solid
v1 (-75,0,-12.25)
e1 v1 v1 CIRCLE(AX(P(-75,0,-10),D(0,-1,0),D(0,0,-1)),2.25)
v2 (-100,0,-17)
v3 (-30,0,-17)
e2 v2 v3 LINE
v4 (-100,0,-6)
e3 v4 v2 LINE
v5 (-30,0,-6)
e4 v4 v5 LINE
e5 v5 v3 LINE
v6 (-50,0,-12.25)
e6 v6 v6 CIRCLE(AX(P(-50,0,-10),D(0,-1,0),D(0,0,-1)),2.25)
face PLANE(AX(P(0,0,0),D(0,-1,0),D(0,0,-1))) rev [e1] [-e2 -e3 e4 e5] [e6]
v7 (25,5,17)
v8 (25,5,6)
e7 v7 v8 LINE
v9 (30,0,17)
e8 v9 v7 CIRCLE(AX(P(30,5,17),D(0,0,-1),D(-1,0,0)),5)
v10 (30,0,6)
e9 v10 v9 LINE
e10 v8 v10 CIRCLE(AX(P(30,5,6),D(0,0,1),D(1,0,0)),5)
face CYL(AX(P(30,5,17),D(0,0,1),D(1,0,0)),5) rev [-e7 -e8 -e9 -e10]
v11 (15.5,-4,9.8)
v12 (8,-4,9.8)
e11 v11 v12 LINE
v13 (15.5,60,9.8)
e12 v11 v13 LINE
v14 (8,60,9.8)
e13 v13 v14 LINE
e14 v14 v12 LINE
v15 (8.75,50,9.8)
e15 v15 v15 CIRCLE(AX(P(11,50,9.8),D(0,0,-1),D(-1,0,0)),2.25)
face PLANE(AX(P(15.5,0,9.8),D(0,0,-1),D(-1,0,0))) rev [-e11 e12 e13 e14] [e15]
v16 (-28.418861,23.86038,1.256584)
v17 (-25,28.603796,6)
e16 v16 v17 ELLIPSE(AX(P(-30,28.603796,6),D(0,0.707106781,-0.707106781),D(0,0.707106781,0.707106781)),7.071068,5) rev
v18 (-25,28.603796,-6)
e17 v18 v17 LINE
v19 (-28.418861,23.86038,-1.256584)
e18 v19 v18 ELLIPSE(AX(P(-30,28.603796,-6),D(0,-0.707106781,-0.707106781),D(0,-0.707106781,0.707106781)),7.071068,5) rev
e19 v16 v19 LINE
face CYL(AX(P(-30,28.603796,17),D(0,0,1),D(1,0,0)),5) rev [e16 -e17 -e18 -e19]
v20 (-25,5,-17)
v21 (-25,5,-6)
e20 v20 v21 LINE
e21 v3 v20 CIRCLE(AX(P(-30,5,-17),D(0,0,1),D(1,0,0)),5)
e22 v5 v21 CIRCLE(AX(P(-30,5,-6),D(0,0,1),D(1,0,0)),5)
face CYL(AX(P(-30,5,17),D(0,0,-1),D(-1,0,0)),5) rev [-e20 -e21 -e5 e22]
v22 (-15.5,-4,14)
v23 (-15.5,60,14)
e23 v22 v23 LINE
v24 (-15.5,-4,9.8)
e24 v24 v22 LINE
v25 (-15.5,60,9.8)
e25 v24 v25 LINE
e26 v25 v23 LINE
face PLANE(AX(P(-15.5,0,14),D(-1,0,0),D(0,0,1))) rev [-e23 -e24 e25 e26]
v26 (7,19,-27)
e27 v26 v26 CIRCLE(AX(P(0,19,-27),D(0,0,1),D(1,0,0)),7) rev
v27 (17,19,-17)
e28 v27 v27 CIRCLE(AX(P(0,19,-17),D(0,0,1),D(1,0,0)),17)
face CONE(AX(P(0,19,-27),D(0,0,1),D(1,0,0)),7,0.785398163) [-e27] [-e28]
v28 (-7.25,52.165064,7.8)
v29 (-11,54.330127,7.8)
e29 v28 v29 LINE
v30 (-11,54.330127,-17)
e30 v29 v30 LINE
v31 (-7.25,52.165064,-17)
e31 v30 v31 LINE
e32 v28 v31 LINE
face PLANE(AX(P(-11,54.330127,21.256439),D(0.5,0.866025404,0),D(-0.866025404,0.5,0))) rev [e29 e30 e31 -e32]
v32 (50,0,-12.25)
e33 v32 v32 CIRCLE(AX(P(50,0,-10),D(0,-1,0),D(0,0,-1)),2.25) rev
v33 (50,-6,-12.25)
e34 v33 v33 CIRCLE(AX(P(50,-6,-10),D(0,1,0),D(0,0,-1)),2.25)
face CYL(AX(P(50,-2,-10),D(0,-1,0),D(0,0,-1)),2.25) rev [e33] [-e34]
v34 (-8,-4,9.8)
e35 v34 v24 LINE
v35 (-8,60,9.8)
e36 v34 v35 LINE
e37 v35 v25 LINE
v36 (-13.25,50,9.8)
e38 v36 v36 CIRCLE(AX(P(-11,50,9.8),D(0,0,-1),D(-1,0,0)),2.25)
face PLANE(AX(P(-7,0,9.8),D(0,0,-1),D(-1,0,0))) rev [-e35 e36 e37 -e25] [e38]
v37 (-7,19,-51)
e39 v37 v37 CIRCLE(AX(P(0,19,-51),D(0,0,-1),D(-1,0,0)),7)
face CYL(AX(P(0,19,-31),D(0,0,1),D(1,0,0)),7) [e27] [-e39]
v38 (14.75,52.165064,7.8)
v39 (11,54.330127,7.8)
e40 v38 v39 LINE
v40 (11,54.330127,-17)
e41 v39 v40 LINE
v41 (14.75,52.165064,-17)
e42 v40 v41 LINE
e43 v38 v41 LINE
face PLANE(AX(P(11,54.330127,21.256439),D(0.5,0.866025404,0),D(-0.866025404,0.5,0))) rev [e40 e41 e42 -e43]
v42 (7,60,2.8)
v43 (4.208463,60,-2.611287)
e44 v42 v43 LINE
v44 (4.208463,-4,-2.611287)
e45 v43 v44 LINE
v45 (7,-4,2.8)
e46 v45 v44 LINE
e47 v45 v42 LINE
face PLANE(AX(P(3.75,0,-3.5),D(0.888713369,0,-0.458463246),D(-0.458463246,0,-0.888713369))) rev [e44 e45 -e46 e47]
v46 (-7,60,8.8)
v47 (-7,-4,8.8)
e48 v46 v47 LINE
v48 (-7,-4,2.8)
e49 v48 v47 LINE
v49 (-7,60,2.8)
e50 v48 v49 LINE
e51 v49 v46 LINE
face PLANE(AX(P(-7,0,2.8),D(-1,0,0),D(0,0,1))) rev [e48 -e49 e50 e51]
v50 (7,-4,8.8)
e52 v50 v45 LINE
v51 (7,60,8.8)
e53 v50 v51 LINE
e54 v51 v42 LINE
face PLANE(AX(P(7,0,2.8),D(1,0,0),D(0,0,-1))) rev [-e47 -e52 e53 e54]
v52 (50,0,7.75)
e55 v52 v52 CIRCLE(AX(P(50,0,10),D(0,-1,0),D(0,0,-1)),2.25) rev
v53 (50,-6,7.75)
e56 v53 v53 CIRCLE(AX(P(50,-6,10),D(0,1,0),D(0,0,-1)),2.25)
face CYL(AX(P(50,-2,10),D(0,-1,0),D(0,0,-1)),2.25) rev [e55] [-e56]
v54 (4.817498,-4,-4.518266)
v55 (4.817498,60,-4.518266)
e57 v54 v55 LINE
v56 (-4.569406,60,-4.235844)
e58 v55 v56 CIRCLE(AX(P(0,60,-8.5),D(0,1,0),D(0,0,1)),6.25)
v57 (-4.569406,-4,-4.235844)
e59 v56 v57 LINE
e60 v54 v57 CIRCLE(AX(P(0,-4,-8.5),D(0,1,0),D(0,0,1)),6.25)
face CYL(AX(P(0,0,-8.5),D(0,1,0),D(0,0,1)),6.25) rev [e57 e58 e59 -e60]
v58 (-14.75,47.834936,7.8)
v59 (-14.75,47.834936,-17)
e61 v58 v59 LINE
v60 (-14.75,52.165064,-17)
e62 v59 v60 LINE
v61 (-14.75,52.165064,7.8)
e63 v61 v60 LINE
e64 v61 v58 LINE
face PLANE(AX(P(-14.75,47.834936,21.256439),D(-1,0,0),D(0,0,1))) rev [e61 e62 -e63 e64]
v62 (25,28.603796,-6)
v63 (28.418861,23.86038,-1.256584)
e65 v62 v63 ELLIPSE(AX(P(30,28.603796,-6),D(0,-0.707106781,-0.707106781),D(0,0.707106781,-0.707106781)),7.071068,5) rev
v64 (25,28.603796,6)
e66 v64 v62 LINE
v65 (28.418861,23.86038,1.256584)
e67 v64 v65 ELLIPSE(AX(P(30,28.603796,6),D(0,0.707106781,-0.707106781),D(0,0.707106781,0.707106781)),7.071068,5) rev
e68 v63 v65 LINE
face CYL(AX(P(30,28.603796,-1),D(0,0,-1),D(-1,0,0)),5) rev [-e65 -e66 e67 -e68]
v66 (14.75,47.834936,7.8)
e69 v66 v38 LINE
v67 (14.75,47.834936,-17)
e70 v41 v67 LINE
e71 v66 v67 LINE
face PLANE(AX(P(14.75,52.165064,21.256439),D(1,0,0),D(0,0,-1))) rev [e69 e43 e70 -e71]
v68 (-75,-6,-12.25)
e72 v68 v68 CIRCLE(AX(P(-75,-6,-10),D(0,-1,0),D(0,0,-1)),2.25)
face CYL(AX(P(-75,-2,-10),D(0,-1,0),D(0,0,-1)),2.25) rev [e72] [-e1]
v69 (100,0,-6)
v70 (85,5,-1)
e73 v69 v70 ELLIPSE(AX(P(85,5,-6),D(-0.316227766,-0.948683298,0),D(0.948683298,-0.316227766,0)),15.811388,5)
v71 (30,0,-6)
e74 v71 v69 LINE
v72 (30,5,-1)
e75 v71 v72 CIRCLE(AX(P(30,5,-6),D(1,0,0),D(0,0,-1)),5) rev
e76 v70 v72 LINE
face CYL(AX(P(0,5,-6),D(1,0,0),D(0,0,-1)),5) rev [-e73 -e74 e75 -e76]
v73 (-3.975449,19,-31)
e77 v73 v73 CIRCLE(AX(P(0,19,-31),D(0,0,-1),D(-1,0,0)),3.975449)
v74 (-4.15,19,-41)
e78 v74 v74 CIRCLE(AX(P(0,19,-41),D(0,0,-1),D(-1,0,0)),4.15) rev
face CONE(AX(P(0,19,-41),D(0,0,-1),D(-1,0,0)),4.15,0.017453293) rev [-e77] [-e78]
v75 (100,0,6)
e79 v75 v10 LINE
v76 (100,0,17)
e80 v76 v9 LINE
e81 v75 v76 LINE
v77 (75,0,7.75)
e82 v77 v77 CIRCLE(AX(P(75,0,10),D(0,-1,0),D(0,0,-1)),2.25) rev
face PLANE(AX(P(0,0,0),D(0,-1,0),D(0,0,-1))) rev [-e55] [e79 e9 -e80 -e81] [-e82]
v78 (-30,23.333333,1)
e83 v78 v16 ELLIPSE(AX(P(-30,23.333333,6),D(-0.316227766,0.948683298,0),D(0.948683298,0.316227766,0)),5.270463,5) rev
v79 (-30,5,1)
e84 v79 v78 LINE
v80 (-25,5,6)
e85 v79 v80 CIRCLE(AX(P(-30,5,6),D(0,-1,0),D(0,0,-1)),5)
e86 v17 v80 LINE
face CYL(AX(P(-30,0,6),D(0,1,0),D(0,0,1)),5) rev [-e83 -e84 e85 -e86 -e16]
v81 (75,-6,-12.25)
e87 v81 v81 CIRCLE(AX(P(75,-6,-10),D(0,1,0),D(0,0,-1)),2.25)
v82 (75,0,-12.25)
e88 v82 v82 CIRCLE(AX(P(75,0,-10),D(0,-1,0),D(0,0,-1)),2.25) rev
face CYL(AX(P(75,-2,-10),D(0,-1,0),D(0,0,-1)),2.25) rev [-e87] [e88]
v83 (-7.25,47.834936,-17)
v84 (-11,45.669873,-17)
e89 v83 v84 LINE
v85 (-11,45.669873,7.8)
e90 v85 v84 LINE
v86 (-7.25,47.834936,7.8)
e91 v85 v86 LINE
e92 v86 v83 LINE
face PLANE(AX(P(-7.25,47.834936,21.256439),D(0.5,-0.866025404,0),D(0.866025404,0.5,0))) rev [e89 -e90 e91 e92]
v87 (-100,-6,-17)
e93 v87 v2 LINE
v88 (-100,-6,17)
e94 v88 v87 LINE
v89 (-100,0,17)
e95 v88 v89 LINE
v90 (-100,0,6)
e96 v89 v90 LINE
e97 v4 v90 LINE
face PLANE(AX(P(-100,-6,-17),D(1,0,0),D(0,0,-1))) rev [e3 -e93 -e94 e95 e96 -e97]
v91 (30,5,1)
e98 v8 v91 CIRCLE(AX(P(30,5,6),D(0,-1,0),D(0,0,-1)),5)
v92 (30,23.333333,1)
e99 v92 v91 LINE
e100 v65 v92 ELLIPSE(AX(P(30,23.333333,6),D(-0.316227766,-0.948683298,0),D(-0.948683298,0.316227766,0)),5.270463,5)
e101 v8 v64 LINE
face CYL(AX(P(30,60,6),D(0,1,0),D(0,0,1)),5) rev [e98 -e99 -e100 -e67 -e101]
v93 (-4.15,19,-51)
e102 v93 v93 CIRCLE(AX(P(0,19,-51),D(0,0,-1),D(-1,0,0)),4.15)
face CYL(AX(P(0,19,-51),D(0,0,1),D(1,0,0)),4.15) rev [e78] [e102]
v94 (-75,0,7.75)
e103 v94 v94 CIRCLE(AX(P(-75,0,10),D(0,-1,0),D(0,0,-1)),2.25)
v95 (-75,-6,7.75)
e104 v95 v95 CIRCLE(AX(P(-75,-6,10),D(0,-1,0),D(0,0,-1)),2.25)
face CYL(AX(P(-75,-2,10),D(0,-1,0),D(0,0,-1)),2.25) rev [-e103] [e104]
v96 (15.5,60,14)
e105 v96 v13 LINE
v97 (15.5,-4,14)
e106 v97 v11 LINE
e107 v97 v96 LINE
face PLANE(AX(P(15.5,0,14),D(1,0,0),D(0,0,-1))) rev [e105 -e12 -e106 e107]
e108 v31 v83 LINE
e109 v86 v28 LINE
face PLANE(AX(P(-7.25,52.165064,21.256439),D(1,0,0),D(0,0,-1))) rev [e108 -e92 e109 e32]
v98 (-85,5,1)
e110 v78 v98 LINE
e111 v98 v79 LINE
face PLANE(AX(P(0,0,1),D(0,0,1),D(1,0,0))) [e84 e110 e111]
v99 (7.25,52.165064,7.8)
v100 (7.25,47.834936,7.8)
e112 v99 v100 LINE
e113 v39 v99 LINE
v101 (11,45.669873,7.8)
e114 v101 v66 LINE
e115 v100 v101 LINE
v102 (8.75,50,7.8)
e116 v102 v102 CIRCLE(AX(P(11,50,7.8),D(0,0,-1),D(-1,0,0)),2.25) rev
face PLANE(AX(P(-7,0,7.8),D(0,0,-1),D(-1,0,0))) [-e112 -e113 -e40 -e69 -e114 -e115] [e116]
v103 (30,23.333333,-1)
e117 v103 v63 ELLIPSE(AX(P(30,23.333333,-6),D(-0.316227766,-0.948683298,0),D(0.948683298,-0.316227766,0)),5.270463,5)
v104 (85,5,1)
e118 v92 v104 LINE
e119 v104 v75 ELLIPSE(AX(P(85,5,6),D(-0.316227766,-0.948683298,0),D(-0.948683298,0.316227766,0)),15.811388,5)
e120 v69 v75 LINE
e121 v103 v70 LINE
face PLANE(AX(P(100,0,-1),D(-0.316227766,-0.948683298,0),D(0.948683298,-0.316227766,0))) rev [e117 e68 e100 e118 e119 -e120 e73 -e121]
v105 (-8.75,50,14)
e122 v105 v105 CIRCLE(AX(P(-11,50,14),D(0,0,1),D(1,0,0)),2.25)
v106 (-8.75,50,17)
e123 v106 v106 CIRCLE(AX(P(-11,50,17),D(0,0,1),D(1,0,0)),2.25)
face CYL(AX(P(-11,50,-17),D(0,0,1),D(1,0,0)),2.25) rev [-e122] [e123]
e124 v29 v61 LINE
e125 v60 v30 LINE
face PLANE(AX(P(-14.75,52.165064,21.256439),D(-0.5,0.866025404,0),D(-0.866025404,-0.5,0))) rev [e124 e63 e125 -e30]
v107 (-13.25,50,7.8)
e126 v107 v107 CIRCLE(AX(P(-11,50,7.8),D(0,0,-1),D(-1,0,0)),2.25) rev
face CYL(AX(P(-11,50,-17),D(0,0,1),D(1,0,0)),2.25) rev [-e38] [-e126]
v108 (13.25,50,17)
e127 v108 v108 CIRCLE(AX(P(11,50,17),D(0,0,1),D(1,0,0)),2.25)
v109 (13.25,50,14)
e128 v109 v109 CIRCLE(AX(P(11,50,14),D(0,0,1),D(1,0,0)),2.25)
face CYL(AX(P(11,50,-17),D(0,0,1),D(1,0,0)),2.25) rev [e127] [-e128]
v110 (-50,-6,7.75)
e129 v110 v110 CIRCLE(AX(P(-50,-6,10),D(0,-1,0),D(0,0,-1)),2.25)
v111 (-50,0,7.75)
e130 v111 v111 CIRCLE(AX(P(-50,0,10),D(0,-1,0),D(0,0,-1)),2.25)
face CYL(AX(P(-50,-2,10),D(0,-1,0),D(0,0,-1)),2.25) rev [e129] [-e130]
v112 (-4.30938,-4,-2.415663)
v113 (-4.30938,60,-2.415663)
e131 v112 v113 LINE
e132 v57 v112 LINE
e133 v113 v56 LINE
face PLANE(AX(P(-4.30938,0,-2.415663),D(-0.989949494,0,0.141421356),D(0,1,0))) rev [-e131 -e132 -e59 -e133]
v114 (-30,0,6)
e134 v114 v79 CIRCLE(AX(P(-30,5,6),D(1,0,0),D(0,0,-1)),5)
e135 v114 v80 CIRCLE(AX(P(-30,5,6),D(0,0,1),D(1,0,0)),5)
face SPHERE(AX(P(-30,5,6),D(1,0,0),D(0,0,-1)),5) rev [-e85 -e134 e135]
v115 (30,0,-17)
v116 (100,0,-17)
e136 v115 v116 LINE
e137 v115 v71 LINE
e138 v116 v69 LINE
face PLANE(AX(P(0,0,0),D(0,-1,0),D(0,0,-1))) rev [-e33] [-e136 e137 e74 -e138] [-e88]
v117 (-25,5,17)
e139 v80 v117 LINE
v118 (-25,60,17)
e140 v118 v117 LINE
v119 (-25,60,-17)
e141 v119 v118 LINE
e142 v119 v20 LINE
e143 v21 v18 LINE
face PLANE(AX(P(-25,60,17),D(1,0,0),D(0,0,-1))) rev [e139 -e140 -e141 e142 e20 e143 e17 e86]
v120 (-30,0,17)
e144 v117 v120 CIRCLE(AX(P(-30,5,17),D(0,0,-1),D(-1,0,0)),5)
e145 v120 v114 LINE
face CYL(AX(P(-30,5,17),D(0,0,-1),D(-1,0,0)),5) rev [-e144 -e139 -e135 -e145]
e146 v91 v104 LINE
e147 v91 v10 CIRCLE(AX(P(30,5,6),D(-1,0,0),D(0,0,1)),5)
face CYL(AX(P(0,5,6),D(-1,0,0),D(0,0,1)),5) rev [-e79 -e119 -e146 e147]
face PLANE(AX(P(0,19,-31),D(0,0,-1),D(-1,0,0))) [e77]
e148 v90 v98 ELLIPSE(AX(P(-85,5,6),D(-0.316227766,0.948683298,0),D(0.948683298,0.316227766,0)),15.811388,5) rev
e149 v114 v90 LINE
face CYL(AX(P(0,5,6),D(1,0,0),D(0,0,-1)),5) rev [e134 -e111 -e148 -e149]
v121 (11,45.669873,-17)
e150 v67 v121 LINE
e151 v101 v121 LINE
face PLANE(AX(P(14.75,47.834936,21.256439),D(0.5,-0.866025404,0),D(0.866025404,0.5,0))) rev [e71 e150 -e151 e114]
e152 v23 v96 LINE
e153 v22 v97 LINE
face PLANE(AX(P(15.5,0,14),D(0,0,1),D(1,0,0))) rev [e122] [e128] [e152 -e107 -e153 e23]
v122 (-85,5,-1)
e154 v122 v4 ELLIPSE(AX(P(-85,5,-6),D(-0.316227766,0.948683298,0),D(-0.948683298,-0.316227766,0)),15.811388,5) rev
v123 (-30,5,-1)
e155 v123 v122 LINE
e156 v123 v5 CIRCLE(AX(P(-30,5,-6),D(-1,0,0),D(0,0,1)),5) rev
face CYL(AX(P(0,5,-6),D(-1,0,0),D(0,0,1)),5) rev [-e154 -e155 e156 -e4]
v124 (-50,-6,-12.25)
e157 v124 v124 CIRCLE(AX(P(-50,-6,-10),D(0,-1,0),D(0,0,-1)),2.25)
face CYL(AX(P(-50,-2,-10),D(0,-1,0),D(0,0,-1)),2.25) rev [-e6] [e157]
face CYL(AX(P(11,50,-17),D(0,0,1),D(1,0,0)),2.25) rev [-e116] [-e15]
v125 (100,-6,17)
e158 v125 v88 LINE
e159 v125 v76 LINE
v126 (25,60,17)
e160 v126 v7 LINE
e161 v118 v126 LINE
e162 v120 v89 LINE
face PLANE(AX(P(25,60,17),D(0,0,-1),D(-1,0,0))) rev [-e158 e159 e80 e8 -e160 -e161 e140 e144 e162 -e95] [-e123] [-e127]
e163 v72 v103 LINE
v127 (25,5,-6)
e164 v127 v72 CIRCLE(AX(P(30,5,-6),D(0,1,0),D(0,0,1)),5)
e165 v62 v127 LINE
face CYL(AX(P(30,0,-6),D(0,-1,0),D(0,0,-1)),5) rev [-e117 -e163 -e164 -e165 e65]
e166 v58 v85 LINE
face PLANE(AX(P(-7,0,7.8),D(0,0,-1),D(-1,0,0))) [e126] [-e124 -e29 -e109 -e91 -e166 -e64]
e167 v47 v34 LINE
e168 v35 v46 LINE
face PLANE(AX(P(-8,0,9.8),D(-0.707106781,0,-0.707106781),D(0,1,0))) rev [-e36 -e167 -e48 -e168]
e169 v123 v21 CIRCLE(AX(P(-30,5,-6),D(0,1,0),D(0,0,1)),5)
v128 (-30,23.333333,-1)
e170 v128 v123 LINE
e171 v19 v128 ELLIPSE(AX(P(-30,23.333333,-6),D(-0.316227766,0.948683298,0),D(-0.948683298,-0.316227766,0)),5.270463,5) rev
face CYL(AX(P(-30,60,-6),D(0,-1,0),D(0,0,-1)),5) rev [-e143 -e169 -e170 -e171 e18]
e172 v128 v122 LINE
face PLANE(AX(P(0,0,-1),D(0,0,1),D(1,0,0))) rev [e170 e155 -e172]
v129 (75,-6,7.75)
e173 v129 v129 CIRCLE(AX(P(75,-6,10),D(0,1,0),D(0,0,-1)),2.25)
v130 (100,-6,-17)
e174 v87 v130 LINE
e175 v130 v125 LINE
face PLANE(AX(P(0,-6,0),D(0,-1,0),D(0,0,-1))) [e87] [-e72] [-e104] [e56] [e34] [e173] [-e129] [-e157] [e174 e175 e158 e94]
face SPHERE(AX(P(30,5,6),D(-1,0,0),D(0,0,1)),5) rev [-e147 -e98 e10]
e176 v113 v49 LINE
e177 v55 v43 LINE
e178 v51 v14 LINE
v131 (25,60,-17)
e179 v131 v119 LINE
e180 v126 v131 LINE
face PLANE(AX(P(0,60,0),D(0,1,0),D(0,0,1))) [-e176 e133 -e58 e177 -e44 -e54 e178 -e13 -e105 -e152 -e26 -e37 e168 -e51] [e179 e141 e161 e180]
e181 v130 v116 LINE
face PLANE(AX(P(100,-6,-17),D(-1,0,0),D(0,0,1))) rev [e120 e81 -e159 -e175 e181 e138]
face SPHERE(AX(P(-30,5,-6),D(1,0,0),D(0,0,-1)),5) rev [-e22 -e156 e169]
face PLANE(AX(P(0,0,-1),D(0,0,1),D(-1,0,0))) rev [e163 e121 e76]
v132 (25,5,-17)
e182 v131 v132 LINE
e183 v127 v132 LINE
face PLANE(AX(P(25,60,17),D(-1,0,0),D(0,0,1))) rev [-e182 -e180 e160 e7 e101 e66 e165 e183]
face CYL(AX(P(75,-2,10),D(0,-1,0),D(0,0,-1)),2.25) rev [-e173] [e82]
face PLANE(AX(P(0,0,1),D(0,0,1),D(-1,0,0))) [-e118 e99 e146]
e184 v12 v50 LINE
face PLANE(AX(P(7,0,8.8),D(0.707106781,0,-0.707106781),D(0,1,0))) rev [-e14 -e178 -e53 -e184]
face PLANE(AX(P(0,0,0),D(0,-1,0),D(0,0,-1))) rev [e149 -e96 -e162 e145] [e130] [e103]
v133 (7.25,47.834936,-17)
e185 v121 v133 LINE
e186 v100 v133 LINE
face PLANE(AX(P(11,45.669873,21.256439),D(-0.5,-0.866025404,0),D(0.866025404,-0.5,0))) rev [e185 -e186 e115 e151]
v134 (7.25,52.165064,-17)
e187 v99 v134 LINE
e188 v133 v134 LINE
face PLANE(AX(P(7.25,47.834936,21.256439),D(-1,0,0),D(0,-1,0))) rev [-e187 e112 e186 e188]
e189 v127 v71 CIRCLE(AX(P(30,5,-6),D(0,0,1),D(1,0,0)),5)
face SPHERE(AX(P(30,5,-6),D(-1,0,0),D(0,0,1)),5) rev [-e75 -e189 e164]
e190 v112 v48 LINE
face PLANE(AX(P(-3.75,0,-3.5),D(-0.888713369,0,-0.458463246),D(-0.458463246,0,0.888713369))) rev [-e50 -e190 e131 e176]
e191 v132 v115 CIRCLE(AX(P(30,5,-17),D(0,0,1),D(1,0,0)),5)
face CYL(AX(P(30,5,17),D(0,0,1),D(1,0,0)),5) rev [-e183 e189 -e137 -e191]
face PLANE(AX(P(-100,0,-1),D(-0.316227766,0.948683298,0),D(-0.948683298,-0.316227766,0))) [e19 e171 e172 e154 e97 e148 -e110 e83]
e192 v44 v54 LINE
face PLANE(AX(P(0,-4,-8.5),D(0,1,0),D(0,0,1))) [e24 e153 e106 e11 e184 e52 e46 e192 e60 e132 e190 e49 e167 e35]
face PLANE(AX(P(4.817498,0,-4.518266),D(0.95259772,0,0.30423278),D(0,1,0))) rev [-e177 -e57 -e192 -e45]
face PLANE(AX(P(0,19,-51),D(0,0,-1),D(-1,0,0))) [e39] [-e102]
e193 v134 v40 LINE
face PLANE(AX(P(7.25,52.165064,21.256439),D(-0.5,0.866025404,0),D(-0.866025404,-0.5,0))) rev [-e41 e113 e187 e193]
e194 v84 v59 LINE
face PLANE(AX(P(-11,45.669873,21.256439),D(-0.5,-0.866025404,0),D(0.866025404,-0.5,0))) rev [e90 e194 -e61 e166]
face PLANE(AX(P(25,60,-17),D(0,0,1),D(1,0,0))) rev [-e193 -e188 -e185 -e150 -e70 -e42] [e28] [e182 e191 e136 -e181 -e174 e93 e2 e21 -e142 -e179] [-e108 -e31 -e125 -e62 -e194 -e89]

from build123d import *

# Parameters (mm, degrees)
SKETCH1_W               = 50
SKETCH1_H               = 34
BOSS_EXTRUDE1_DEPTH     = 60
CUT_EXTRUDE1_DEPTH      = 68.186308129
SKETCH3_R               = 2.25
CUT_EXTRUDE2_DEPTH      = 74.35529974
CUT_EXTRUDE3_DEPTH      = 24.8
CHAMFER1_SIZE           = 1
CHAMFER1_SIZE_2         = 1.220120443
SKETCH5_W               = 200
SKETCH5_H               = 34
BOSS_EXTRUDE2_DEPTH     = 6
BOSS_EXTRUDE3_DEPTH     = 1
FILLET1_R               = 5
FILLET2_R               = 5
SKETCH7_R               = 2.25
CUT_EXTRUDE4_DEPTH      = 4
SKETCH8_R               = 2.25
CUT_EXTRUDE5_DEPTH      = 119.882294729
LPATTERN1_COUNT         = 2
LPATTERN1_PITCH         = 25
MIRROR4_COPY_1_SKETCH_R = 2.25
MIRROR4_COPY_1_DEPTH    = 4
MIRROR4_COPY_2_SKETCH_R = 2.25
MIRROR4_COPY_2_DEPTH    = 119.882294729
CUT_EXTRUDE6_DEPTH      = 4
SKETCH10_R              = 7
BOSS_EXTRUDE4_DEPTH     = 14
SKETCH11_R              = 7
SKETCH11_R_2            = 4.15
BOSS_EXTRUDE5_DEPTH     = 20
CHAMFER2_SIZE           = 10
CHAMFER2_SIZE2          = 0.174550649
CHAMFER3_SIZE           = 10


with BuildPart() as part:
    # Sketch1 → Boss-Extrude1 (new body)
    with BuildSketch(Plane(origin=(0, 0, 0), x_dir=(1, 0, 0), z_dir=(0, 1, 0))):
        Rectangle(SKETCH1_W, SKETCH1_H)
    extrude(amount=BOSS_EXTRUDE1_DEPTH)

    # Sketch2 → Cut-Extrude1 (cut, through all)
    with BuildSketch(Plane(origin=(0, 60, 0), x_dir=(1, 0, 0), z_dir=(0, 1, 0))):
        with BuildLine():
            Line((-3.75, 3.5), (-7, -2.8))
            Line((-7, -2.8), (-7, -9.8))
            Line((-7, -9.8), (-15.5, -9.8))
            Line((-15.5, -9.8), (-15.5, -14))
            Line((-15.5, -14), (15.5, -14))
            Line((15.5, -14), (15.5, -9.8))
            Line((15.5, -9.8), (7, -9.8))
            Line((7, -9.8), (7, -2.8))
            Line((7, -2.8), (3.75, 3.5))
            ThreePointArc((3.75, 3.5), (0, 14.75), (-3.75, 3.5))
        make_face()
    extrude(amount=-CUT_EXTRUDE1_DEPTH, mode=Mode.SUBTRACT)

    # Sketch3 → Cut-Extrude2 (cut, through all)
    with BuildSketch(Plane.XY.offset(17)):
        with Locations((-11, 50)):
            Circle(SKETCH3_R)
        with Locations((11, 50)):
            Circle(SKETCH3_R)
    extrude(amount=-CUT_EXTRUDE2_DEPTH, mode=Mode.SUBTRACT)

    # Sketch4 → Cut-Extrude3 (cut)
    with BuildSketch(Plane(origin=(0, 0, -17), x_dir=(-1, 0, 0), z_dir=(0, 0, -1))):
        Polygon((14.75, 52.165063509), (11, 54.330127019), (7.25, 52.165063509), (7.25, 47.834936491), (11, 45.669872981), (14.75, 47.834936491), align=None)
        Polygon((-7.25, 47.834936491), (-7.25, 52.165063509), (-11, 54.330127019), (-14.75, 52.165063509), (-14.75, 47.834936491), (-11, 45.669872981), align=None)
    extrude(amount=-CUT_EXTRUDE3_DEPTH, mode=Mode.SUBTRACT)

    # Chamfer1
    # the kernel refuses this chamfer: 1.220120443, 1 mm, written as the material it takes off along each edge
    with BuildSketch(Plane(origin=(-7, 62.571682988, 9.8), x_dir=(-1, 0, 0), z_dir=(0, -1, 0)), Plane(origin=(7, 62.571682988, 9.8), x_dir=(0, 0, -1), z_dir=(0, -1, 0))) as chamfer1_piece_1:
        Polygon((CHAMFER1_SIZE, 0), (0, CHAMFER1_SIZE), (0, 0), align=None)
    extrude(amount=65.143365976, mode=Mode.SUBTRACT)
    with BuildSketch(Plane(origin=(-3.75, 63.150527813, -3.5), x_dir=(-0.45846324589157744, 0, 0.8887133689590581), z_dir=(0, -1, 0))) as chamfer1_piece_2:
        with BuildLine():
            Line((CHAMFER1_SIZE_2, 0), (-0.278286757, 1.065574765))
            ThreePointArc((-0.278286757, 1.065574765), (-0.120412167, 0.557139368), (0, 0))
            Line((0, 0), (CHAMFER1_SIZE_2, 0))
        make_face()
    extrude(amount=66.301055626, mode=Mode.SUBTRACT)
    with BuildSketch(Plane(origin=(3.75, 63.795705698, -3.5), x_dir=(0.7235959376340886, 0, -0.6902238180760238), z_dir=(0, -1, 0))) as chamfer1_piece_3:
        with BuildLine():
            Line((1.475268649, 0), (-CHAMFER1_SIZE * 0.281668992416, CHAMFER1_SIZE * 0.959511635527))
            Line((-CHAMFER1_SIZE * 0.281668992416, CHAMFER1_SIZE * 0.959511635527), (0, 0))
            ThreePointArc((0, 0), (0.759242358, 0.043643641), (1.475268649, 0))
        make_face()
    extrude(amount=67.591411396, mode=Mode.SUBTRACT)

    # Sketch5 → Boss-Extrude2 (add)
    with BuildSketch(Plane.XZ):
        Rectangle(SKETCH5_W, SKETCH5_H)
    extrude(amount=BOSS_EXTRUDE2_DEPTH)

    # Sketch6 → Boss-Extrude3 (add, symmetric)
    with BuildSketch(Plane.XY):
        Polygon((-100, 0), (-25, 25), (-25, 0), align=None)
    boss_extrude3 = extrude(amount=BOSS_EXTRUDE3_DEPTH, both=True)

    # Mirror3: Boss-Extrude3 across plane
    add(boss_extrude3.mirror(Plane(origin=(0, 0, 0), x_dir=(0, 0, 1), z_dir=(1, 0, 0))))

    # Fillet1
    # the kernel refuses this fillet: 5 mm, written as the material it adds along each edge
    with BuildSketch(Plane(origin=(-12.5, 0, -1), x_dir=(0, 0, -1), z_dir=(-1, 0, 0))) as fillet1_piece_1_section:
        with BuildLine():
            CenterArc((FILLET1_R, -FILLET1_R), FILLET1_R, 90, 90)
            Line((0, -FILLET1_R), (0, 0))
            Line((0, 0), (FILLET1_R, 0))
        make_face()
    fillet1_piece_1 = extrude(amount=87.5, mode=Mode.PRIVATE)
    fillet1_piece_1 = split(fillet1_piece_1, bisect_by=Plane(origin=(-21.25, 26.25, -1), z_dir=(0.31622776601683794, -0.9486832980505139, 0)), keep=Keep.TOP, mode=Mode.PRIVATE)
    add(fillet1_piece_1)
    with BuildSketch(Plane(origin=(-12.5, 0, 1), x_dir=(0, 0, 1), z_dir=(-1, 0, 0))) as fillet1_piece_2_section:
        with BuildLine():
            CenterArc((FILLET1_R, FILLET1_R), FILLET1_R, 180, 90)
            Line((0, FILLET1_R), (0, 0))
            Line((0, 0), (FILLET1_R, 0))
        make_face()
    fillet1_piece_2 = extrude(amount=87.5, mode=Mode.PRIVATE)
    fillet1_piece_2 = split(fillet1_piece_2, bisect_by=Plane(origin=(-21.25, 26.25, 1), z_dir=(0.31622776601683794, -0.9486832980505139, 0)), keep=Keep.TOP, mode=Mode.PRIVATE)
    add(fillet1_piece_2)
    with BuildSketch(Plane(origin=(12.5, 0, 1), x_dir=(0, 0, 1), z_dir=(1, 0, 0))) as fillet1_piece_3_section:
        with BuildLine():
            CenterArc((FILLET1_R, -FILLET1_R), FILLET1_R, 90, 90)
            Line((0, -FILLET1_R), (0, 0))
            Line((0, 0), (FILLET1_R, 0))
        make_face()
    fillet1_piece_3 = extrude(amount=87.5, mode=Mode.PRIVATE)
    fillet1_piece_3 = split(fillet1_piece_3, bisect_by=Plane(origin=(21.25, 26.25, 1), z_dir=(-0.31622776601683794, -0.9486832980505139, 0)), keep=Keep.TOP, mode=Mode.PRIVATE)
    add(fillet1_piece_3)
    with BuildSketch(Plane(origin=(12.5, 0, -1), x_dir=(0, 0, -1), z_dir=(1, 0, 0))) as fillet1_piece_4_section:
        with BuildLine():
            CenterArc((FILLET1_R, FILLET1_R), FILLET1_R, 180, 90)
            Line((0, FILLET1_R), (0, 0))
            Line((0, 0), (FILLET1_R, 0))
        make_face()
    fillet1_piece_4 = extrude(amount=87.5, mode=Mode.PRIVATE)
    fillet1_piece_4 = split(fillet1_piece_4, bisect_by=Plane(origin=(21.25, 26.25, -1), z_dir=(-0.31622776601683794, -0.9486832980505139, 0)), keep=Keep.TOP, mode=Mode.PRIVATE)
    add(fillet1_piece_4)

    # Fillet2
    fillet2_edges = [part.edges().sort_by_distance(p)[0] for p in [
        (-25, 25, 0),
        (25, 25, 0),
        (25, 15, -1),
        (25, 0, -11.5),
        (25, 15, 1),
        (25, 1.464466094, 2.464466094),
        (25, 1.464466094, -2.464466094),
        (-25, 15, -1),
        (-25, 15, 1),
        (-25, 0, 11.5),
        (-25, 1.464466094, 2.464466094),
        (-25, 1.464466094, -2.464466094),
        (25, 0, 11.5),
        (-25, 0, -11.5),
    ]]
    fillet(fillet2_edges, radius=FILLET2_R)

    # Sketch7 → Cut-Extrude4 (cut)
    with BuildSketch(Plane.XZ.offset(6)):
        with Locations(Location((-75, 10, 0), (0, 0, 270))):
            Circle(SKETCH7_R)
        with Locations(Location((-75, -10, 0), (0, 0, 270))):
            Circle(SKETCH7_R)
    cut_extrude4 = extrude(amount=-CUT_EXTRUDE4_DEPTH, mode=Mode.SUBTRACT)

    # Sketch8 → Cut-Extrude5 (cut, through all)
    with BuildSketch(Plane(origin=(0, -2, 0), x_dir=(-1, 0, 0), z_dir=(0, -1, 0))):
        with Locations(Location((75, -10, 0), (0, 0, 90))):
            Circle(SKETCH8_R)
        with Locations(Location((75, 10, 0), (0, 0, 90))):
            Circle(SKETCH8_R)
    cut_extrude5 = extrude(amount=-CUT_EXTRUDE5_DEPTH, mode=Mode.SUBTRACT)

    # LPattern1: Cut-Extrude4, Cut-Extrude5 ×2
    with Locations(*[(i * LPATTERN1_PITCH, 0, 0) for i in range(1, LPATTERN1_COUNT)]):
        add(cut_extrude4, mode=Mode.SUBTRACT)
        add(cut_extrude5, mode=Mode.SUBTRACT)

    # Mirror4: Cut-Extrude4, Cut-Extrude5 across plane
    add(cut_extrude4.mirror(Plane(origin=(0, 0, 0), x_dir=(0, 0, 1), z_dir=(1, 0, 0))), mode=Mode.SUBTRACT)
    add(cut_extrude5.mirror(Plane(origin=(0, 0, 0), x_dir=(0, 0, 1), z_dir=(1, 0, 0))), mode=Mode.SUBTRACT)

    # Mirror4 copy 1 sketch → Mirror4 copy 1 (cut)
    with BuildSketch(Plane(origin=(-25, -6, 0), x_dir=(-1, 0, 0), z_dir=(0, -1, 0))):
        with Locations((-75, -10)):
            Circle(MIRROR4_COPY_1_SKETCH_R)
        with Locations((-75, 10)):
            Circle(MIRROR4_COPY_1_SKETCH_R)
    extrude(amount=-MIRROR4_COPY_1_DEPTH, mode=Mode.SUBTRACT)

    # Mirror4 copy 2 sketch → Mirror4 copy 2 (cut, through all)
    with BuildSketch(Plane(origin=(-25, -2, 0), x_dir=(1, 0, 0), z_dir=(0, -1, 0))):
        with Locations((75, 10)):
            Circle(MIRROR4_COPY_2_SKETCH_R)
        with Locations((75, -10)):
            Circle(MIRROR4_COPY_2_SKETCH_R)
    extrude(amount=-MIRROR4_COPY_2_DEPTH, mode=Mode.SUBTRACT)

    # Sketch9 → Cut-Extrude6 (cut)
    with BuildSketch(Plane(origin=(0, 0, 0), x_dir=(1, 0, 0), z_dir=(0, 1, 0))):
        with BuildLine():
            Line((4.208463246, 2.611286631), (4.817498401, 4.518265559))
            ThreePointArc((4.817498401, 4.518265559), (-0.187957188, 14.747173128), (-4.56940629, 4.235844027))
            Line((-4.56940629, 4.235844027), (-4.309380379, 2.415662651))
            Line((-4.309380379, 2.415662651), (-7, -2.8))
            Line((-7, -2.8), (-7, -8.8))
            Line((-7, -8.8), (-8, -9.8))
            Line((-8, -9.8), (-15.5, -9.8))
            Line((-15.5, -9.8), (-15.5, -14))
            Line((-15.5, -14), (15.5, -14))
            Line((15.5, -14), (15.5, -9.8))
            Line((15.5, -9.8), (8, -9.8))
            Line((8, -9.8), (7, -8.8))
            Line((7, -8.8), (7, -2.8))
            Line((7, -2.8), (4.208463246, 2.611286631))
        make_face()
    extrude(amount=-CUT_EXTRUDE6_DEPTH, mode=Mode.SUBTRACT)

    # Sketch10 → Boss-Extrude4 (add)
    with BuildSketch(Plane(origin=(0, 0, -17), x_dir=(-1, 0, 0), z_dir=(0, 0, -1))):
        with Locations(Location((0, 19, 0), (0, 0, 180))):
            Circle(SKETCH10_R)
    extrude(amount=BOSS_EXTRUDE4_DEPTH)

    # Sketch11 → Boss-Extrude5 (add)
    with BuildSketch(Plane(origin=(0, 0, -31), x_dir=(-1, 0, 0), z_dir=(0, 0, -1))):
        with Locations(Location((0, 19, 0), (0, 0, 180))):
            Circle(SKETCH11_R)
        with Locations((0, 19)):
            Circle(SKETCH11_R_2, mode=Mode.SUBTRACT)
    extrude(amount=BOSS_EXTRUDE5_DEPTH)

    # Chamfer2
    chamfer2_edges = [part.edges().sort_by_distance(p)[0] for p in [
        (4.15, 19, -31),
    ]]
    chamfer2_side = [part.faces().sort_by_distance(p)[0] for p in [
        (4.15, 19, -41),
    ]]
    chamfer(chamfer2_edges, length=CHAMFER2_SIZE, length2=CHAMFER2_SIZE2, reference=chamfer2_side[0])

    # Chamfer3
    chamfer3_edges = [part.edges().sort_by_distance(p)[0] for p in [
        (-7, 19, -17),
    ]]
    chamfer(chamfer3_edges, length=CHAMFER3_SIZE)


solid = part.part
